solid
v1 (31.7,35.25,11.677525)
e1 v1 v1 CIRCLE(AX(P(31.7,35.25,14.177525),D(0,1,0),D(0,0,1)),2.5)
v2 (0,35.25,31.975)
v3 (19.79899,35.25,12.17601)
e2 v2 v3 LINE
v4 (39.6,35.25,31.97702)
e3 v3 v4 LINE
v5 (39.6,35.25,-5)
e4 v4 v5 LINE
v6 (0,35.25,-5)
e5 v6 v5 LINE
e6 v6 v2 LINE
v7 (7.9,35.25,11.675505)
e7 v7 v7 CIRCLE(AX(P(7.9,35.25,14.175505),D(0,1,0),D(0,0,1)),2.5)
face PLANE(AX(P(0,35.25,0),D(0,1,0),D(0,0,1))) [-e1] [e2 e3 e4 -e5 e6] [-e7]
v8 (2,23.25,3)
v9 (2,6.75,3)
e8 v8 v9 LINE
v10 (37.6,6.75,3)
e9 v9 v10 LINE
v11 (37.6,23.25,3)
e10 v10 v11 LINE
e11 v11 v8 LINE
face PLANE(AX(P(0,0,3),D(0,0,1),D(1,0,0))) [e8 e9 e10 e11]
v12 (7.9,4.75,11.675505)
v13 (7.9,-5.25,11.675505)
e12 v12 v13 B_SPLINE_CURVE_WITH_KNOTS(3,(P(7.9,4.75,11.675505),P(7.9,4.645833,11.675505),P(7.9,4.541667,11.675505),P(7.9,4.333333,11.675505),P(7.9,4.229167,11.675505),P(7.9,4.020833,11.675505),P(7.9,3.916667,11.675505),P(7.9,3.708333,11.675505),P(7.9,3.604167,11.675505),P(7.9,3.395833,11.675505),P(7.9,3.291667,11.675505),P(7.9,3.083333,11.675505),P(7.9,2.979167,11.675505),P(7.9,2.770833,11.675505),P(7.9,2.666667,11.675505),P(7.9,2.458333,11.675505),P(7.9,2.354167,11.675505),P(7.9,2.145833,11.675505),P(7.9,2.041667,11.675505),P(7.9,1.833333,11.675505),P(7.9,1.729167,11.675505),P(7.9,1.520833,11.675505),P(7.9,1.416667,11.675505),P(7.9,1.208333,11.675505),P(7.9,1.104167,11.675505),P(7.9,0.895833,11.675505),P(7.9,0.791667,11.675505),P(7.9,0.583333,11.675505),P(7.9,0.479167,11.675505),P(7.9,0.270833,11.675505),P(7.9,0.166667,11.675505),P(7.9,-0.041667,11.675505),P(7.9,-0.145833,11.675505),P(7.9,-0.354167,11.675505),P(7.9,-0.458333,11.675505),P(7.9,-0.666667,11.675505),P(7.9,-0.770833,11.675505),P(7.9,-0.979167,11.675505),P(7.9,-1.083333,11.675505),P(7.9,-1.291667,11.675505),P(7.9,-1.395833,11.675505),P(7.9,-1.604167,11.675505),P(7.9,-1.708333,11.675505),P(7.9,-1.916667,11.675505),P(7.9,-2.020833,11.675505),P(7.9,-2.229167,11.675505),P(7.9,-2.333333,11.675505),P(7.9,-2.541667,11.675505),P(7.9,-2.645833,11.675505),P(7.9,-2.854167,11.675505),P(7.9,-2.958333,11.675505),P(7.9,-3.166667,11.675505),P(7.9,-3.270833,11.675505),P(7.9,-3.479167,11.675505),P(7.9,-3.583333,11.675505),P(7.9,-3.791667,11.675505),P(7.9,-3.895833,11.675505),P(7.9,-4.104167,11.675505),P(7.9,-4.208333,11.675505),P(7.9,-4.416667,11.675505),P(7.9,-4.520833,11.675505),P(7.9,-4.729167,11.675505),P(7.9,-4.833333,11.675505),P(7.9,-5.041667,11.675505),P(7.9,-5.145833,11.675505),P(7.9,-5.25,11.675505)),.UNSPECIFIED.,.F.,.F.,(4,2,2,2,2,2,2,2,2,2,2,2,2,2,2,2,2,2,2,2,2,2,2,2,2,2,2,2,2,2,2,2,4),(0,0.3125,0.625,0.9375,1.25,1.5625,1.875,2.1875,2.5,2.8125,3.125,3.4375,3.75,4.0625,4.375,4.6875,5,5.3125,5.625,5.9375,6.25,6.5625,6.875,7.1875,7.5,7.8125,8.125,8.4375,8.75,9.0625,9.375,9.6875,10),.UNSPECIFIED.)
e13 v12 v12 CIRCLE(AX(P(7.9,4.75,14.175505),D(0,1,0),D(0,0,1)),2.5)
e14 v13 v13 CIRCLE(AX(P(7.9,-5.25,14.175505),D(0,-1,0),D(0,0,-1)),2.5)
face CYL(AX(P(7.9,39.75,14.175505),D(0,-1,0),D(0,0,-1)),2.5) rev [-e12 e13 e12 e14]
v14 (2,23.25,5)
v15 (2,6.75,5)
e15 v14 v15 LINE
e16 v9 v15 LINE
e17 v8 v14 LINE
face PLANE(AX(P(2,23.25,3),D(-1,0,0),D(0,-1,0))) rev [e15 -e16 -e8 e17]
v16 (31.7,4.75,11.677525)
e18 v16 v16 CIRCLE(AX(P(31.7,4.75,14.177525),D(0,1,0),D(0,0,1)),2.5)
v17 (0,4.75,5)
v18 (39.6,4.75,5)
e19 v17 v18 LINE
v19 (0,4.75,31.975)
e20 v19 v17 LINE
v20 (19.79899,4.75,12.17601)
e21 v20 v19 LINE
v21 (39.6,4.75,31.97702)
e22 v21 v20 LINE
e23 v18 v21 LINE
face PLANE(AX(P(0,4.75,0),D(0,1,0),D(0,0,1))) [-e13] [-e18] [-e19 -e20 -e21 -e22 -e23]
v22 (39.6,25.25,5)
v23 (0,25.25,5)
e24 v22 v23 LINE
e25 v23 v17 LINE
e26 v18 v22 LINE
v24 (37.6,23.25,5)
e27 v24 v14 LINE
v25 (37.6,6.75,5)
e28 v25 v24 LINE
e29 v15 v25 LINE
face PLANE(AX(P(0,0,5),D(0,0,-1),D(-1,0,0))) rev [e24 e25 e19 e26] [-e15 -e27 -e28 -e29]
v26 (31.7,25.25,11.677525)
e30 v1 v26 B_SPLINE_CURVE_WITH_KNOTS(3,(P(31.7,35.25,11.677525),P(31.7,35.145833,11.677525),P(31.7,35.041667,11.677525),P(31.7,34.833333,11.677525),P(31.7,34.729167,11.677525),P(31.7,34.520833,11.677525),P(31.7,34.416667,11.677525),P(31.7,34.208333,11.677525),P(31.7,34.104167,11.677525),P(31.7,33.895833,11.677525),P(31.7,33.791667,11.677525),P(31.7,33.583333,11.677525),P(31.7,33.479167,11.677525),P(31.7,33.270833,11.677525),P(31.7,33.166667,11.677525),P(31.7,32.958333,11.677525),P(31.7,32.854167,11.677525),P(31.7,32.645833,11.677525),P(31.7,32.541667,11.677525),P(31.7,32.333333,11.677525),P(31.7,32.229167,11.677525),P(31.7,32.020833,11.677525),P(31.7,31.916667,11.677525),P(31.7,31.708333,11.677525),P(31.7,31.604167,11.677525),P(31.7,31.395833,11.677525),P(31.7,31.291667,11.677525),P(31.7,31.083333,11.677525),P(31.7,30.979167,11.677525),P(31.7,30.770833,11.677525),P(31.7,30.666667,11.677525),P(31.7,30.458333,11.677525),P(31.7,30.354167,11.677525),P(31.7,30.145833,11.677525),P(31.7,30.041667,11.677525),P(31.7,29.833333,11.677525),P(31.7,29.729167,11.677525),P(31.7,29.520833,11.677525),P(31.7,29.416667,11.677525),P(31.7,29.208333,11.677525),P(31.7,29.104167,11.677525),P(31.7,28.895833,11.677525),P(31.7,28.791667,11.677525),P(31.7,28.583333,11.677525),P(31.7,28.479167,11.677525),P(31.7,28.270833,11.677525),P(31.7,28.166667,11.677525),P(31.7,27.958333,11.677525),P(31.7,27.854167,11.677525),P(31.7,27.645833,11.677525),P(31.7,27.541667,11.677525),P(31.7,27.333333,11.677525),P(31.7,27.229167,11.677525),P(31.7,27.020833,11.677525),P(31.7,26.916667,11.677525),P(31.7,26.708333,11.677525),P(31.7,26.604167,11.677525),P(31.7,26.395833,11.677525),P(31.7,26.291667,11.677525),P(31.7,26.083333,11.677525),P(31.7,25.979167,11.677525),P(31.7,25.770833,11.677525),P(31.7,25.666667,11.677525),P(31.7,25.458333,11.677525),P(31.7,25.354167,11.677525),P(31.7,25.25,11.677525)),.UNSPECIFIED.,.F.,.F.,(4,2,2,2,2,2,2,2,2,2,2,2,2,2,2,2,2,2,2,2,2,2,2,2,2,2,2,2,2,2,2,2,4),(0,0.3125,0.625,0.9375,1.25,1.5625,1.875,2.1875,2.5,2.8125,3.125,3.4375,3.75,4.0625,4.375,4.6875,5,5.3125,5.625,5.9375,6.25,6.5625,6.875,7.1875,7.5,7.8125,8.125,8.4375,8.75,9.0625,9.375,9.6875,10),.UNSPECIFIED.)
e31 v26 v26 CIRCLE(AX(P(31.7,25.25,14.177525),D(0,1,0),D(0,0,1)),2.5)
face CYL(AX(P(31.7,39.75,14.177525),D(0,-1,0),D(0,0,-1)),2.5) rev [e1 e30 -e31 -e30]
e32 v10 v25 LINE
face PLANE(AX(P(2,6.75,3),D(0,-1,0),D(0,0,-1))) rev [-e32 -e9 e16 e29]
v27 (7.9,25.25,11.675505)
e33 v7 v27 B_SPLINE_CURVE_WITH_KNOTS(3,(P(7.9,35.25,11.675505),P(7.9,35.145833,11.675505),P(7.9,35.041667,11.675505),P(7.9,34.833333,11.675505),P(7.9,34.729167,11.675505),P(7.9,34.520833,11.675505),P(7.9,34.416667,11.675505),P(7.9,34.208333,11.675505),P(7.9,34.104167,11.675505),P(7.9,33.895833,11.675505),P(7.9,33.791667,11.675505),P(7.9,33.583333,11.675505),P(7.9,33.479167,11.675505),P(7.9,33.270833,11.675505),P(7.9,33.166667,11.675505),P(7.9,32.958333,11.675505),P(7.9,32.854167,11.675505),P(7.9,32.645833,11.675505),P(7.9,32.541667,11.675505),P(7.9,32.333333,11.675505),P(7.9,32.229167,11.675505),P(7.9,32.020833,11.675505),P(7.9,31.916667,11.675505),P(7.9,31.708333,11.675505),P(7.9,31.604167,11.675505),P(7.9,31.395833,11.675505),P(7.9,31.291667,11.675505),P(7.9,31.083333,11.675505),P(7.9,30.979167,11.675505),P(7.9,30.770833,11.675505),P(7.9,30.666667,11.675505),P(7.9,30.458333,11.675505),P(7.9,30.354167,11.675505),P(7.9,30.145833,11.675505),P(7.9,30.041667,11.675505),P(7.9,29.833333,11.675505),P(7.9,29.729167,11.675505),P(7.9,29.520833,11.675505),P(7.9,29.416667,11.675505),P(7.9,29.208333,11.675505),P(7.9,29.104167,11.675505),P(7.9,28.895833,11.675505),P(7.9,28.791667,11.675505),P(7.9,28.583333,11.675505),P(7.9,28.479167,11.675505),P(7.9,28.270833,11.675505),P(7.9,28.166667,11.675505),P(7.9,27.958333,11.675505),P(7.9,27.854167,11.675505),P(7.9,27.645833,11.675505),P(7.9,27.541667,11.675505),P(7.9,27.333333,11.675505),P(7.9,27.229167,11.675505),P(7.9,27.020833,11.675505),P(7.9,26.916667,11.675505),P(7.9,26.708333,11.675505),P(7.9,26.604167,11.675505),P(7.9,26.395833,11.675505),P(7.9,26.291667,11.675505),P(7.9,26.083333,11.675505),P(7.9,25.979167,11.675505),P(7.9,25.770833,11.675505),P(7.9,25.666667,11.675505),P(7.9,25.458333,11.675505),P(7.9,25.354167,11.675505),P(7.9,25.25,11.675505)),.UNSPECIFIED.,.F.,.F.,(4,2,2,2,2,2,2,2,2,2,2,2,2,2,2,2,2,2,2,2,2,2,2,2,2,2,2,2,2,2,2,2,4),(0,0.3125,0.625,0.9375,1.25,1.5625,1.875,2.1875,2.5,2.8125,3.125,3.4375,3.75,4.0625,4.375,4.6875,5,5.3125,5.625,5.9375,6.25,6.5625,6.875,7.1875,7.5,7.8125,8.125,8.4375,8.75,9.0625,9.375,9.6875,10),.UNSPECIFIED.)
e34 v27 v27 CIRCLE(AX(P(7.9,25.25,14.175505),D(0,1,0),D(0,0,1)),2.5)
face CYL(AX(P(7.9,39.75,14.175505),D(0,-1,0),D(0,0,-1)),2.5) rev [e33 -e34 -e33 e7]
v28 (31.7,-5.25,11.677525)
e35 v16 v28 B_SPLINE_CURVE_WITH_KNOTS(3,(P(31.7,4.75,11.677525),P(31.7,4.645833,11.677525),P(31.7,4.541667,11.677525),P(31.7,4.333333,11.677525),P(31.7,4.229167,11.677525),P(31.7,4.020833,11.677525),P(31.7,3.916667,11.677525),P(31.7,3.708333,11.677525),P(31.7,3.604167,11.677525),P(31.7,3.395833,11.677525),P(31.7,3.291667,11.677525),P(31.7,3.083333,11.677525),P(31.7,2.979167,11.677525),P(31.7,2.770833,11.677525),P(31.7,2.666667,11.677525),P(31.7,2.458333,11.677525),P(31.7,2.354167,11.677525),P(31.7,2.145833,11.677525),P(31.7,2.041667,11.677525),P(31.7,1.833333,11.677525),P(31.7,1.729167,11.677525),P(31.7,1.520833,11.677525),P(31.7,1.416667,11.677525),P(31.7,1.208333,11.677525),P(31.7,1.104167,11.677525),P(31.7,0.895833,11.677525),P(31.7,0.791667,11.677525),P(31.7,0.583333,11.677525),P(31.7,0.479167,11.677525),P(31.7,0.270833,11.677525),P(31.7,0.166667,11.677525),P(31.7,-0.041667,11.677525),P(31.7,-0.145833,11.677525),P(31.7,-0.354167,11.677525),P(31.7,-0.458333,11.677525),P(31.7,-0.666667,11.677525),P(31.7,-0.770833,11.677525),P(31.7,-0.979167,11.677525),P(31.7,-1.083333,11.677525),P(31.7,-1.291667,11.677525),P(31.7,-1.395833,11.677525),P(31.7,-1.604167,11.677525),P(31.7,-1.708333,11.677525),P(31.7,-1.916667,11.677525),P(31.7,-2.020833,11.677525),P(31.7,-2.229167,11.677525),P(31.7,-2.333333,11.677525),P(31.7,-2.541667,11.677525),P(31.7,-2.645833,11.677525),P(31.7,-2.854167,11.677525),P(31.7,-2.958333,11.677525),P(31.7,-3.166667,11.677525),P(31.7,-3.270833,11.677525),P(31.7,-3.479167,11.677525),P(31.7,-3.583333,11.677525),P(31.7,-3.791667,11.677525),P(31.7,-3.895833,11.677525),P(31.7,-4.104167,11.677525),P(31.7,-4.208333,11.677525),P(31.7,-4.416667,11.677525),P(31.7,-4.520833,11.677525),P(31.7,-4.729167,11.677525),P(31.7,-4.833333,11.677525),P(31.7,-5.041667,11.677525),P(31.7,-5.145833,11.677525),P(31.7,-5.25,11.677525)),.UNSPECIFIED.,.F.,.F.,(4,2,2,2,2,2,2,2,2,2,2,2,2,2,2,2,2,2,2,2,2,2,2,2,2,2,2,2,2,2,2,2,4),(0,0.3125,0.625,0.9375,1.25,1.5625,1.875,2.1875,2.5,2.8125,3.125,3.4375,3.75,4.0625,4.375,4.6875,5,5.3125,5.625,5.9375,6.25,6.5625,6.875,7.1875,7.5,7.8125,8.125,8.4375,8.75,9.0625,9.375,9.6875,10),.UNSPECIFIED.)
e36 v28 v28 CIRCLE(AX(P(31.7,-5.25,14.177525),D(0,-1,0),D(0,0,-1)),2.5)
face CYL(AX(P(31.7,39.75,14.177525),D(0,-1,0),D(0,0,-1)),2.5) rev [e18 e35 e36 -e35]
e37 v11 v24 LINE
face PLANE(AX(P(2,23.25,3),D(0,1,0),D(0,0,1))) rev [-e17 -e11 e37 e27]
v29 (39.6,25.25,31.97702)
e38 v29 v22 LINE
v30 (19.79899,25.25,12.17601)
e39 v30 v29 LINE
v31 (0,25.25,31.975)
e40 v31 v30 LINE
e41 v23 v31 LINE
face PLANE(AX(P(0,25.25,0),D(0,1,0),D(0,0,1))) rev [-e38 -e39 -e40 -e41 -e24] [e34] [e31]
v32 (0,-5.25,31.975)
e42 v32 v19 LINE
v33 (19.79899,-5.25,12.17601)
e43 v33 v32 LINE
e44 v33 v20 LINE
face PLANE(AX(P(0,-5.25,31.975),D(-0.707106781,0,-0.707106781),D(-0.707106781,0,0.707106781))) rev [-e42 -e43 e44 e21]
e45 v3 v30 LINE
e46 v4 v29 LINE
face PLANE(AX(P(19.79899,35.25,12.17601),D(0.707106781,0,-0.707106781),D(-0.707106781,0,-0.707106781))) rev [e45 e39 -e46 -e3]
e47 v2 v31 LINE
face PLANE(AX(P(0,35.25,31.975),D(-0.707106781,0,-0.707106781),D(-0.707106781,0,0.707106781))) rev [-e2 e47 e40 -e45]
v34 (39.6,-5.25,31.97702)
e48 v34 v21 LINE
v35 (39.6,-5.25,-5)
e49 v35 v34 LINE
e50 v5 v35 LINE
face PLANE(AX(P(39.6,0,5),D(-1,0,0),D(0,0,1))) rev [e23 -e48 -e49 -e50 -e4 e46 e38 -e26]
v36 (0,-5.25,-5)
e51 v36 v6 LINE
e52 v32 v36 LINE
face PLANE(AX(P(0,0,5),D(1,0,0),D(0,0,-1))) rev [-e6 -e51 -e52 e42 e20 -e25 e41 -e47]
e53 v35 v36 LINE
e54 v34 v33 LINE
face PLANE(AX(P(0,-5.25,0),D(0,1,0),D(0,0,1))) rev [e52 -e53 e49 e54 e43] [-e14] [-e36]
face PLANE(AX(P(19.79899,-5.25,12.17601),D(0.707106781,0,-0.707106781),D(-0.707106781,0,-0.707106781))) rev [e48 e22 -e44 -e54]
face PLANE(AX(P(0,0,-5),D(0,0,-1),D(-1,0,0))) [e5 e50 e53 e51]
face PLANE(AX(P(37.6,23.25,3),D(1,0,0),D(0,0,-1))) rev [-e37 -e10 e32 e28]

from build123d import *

# Parameters (mm, degrees)
SKETCH1_W                = 39.6
SKETCH1_H                = 30
BOSS_EXTRUDE1_DEPTH      = 5
BOSS_EXTRUDE2_DEPTH      = 5.25
BOSS_EXTRUDE2_DEPTH_BACK = 4.75
BOSS_EXTRUDE3_DEPTH      = 5.25
BOSS_EXTRUDE3_DEPTH_BACK = 4.75
SKETCH4_W                = 39.6
SKETCH4_H                = 5
BOSS_EXTRUDE4_DEPTH      = 5.25
SKETCH5_W                = 39.6
SKETCH5_H                = 5
BOSS_EXTRUDE5_DEPTH      = 5.25
SKETCH8_W                = 39.6
SKETCH8_H                = 40.5
BOSS_EXTRUDE6_DEPTH      = 5
SKETCH9_W                = 35.6
SKETCH9_H                = 16.5
CUT_EXTRUDE1_DEPTH       = 2
HOLE1_START              = -5.25
HOLE1_OUTLINE_R          = 2.5
HOLE1_DEPTH              = 40.5
HOLE2_START              = -5.25
HOLE2_OUTLINE_R          = 2.5
HOLE2_DEPTH              = 40.5


# Read off the part's stored shape, not the designer's step: Hole1, Hole2
with BuildPart() as part:
    # Sketch1 → Boss-Extrude1 (new body)
    with BuildSketch(Plane.XY):
        with Locations((19.8, 15)):
            Rectangle(SKETCH1_W, SKETCH1_H)
    extrude(amount=BOSS_EXTRUDE1_DEPTH)

    # Sketch2 → Boss-Extrude2 (add, two sides: drawn at the far end of the back side and taken through both)
    with BuildSketch(Plane.XZ.offset(-BOSS_EXTRUDE2_DEPTH_BACK)):
        Polygon((0, 5), (0, 31.975), (19.798989873, 12.176010127), (39.6, 31.977020254), (39.6, 5), align=None)
    extrude(amount=BOSS_EXTRUDE2_DEPTH + BOSS_EXTRUDE2_DEPTH_BACK)

    # Sketch3 → Boss-Extrude3 (add, two sides: drawn at the far end of the back side and taken through both)
    with BuildSketch(Plane(origin=(0, 30, 0), x_dir=(1, 0, 0), z_dir=(0, 1, 0)).offset(-BOSS_EXTRUDE3_DEPTH_BACK)):
        Polygon((0, -5), (0, -31.975), (19.798989873, -12.176010127), (39.6, -31.977020254), (39.6, -5), align=None)
    extrude(amount=BOSS_EXTRUDE3_DEPTH + BOSS_EXTRUDE3_DEPTH_BACK)

    # Sketch4 → Boss-Extrude4 (add)
    with BuildSketch(Plane(origin=(0, 30, 0), x_dir=(1, 0, 0), z_dir=(0, 1, 0))):
        with Locations((19.8, -2.5)):
            Rectangle(SKETCH4_W, SKETCH4_H)
    extrude(amount=BOSS_EXTRUDE4_DEPTH)

    # Sketch5 → Boss-Extrude5 (add)
    with BuildSketch(Plane.XZ):
        with Locations((19.8, 2.5)):
            Rectangle(SKETCH5_W, SKETCH5_H)
    extrude(amount=BOSS_EXTRUDE5_DEPTH)

    # Sketch8 → Boss-Extrude6 (add)
    with BuildSketch(Plane(origin=(0, 0, 0), x_dir=(-1, 0, 0), z_dir=(0, 0, -1))):
        with Locations((-19.8, 15)):
            Rectangle(SKETCH8_W, SKETCH8_H)
    extrude(amount=BOSS_EXTRUDE6_DEPTH)

    # Sketch9 → Cut-Extrude1 (cut)
    with BuildSketch(Plane.XY.offset(5)):
        with Locations((19.8, 15)):
            Rectangle(SKETCH9_W, SKETCH9_H)
    extrude(amount=-CUT_EXTRUDE1_DEPTH, mode=Mode.SUBTRACT)

    # Hole1 outline → Hole1 (cut)
    with BuildSketch(Plane(origin=(0, 0, 0), x_dir=(1, 0, 0), z_dir=(0, 1, 0)).offset(HOLE1_START)):
        with Locations((7.9, -14.175505063)):
            Circle(HOLE1_OUTLINE_R)
    extrude(amount=HOLE1_DEPTH, mode=Mode.SUBTRACT)

    # Hole2 outline → Hole2 (cut)
    with BuildSketch(Plane(origin=(0, 0, 0), x_dir=(1, 0, 0), z_dir=(0, 1, 0)).offset(HOLE2_START)):
        with Locations((31.7, -14.177525317)):
            Circle(HOLE2_OUTLINE_R)
    extrude(amount=HOLE2_DEPTH, mode=Mode.SUBTRACT)


solid = part.part
